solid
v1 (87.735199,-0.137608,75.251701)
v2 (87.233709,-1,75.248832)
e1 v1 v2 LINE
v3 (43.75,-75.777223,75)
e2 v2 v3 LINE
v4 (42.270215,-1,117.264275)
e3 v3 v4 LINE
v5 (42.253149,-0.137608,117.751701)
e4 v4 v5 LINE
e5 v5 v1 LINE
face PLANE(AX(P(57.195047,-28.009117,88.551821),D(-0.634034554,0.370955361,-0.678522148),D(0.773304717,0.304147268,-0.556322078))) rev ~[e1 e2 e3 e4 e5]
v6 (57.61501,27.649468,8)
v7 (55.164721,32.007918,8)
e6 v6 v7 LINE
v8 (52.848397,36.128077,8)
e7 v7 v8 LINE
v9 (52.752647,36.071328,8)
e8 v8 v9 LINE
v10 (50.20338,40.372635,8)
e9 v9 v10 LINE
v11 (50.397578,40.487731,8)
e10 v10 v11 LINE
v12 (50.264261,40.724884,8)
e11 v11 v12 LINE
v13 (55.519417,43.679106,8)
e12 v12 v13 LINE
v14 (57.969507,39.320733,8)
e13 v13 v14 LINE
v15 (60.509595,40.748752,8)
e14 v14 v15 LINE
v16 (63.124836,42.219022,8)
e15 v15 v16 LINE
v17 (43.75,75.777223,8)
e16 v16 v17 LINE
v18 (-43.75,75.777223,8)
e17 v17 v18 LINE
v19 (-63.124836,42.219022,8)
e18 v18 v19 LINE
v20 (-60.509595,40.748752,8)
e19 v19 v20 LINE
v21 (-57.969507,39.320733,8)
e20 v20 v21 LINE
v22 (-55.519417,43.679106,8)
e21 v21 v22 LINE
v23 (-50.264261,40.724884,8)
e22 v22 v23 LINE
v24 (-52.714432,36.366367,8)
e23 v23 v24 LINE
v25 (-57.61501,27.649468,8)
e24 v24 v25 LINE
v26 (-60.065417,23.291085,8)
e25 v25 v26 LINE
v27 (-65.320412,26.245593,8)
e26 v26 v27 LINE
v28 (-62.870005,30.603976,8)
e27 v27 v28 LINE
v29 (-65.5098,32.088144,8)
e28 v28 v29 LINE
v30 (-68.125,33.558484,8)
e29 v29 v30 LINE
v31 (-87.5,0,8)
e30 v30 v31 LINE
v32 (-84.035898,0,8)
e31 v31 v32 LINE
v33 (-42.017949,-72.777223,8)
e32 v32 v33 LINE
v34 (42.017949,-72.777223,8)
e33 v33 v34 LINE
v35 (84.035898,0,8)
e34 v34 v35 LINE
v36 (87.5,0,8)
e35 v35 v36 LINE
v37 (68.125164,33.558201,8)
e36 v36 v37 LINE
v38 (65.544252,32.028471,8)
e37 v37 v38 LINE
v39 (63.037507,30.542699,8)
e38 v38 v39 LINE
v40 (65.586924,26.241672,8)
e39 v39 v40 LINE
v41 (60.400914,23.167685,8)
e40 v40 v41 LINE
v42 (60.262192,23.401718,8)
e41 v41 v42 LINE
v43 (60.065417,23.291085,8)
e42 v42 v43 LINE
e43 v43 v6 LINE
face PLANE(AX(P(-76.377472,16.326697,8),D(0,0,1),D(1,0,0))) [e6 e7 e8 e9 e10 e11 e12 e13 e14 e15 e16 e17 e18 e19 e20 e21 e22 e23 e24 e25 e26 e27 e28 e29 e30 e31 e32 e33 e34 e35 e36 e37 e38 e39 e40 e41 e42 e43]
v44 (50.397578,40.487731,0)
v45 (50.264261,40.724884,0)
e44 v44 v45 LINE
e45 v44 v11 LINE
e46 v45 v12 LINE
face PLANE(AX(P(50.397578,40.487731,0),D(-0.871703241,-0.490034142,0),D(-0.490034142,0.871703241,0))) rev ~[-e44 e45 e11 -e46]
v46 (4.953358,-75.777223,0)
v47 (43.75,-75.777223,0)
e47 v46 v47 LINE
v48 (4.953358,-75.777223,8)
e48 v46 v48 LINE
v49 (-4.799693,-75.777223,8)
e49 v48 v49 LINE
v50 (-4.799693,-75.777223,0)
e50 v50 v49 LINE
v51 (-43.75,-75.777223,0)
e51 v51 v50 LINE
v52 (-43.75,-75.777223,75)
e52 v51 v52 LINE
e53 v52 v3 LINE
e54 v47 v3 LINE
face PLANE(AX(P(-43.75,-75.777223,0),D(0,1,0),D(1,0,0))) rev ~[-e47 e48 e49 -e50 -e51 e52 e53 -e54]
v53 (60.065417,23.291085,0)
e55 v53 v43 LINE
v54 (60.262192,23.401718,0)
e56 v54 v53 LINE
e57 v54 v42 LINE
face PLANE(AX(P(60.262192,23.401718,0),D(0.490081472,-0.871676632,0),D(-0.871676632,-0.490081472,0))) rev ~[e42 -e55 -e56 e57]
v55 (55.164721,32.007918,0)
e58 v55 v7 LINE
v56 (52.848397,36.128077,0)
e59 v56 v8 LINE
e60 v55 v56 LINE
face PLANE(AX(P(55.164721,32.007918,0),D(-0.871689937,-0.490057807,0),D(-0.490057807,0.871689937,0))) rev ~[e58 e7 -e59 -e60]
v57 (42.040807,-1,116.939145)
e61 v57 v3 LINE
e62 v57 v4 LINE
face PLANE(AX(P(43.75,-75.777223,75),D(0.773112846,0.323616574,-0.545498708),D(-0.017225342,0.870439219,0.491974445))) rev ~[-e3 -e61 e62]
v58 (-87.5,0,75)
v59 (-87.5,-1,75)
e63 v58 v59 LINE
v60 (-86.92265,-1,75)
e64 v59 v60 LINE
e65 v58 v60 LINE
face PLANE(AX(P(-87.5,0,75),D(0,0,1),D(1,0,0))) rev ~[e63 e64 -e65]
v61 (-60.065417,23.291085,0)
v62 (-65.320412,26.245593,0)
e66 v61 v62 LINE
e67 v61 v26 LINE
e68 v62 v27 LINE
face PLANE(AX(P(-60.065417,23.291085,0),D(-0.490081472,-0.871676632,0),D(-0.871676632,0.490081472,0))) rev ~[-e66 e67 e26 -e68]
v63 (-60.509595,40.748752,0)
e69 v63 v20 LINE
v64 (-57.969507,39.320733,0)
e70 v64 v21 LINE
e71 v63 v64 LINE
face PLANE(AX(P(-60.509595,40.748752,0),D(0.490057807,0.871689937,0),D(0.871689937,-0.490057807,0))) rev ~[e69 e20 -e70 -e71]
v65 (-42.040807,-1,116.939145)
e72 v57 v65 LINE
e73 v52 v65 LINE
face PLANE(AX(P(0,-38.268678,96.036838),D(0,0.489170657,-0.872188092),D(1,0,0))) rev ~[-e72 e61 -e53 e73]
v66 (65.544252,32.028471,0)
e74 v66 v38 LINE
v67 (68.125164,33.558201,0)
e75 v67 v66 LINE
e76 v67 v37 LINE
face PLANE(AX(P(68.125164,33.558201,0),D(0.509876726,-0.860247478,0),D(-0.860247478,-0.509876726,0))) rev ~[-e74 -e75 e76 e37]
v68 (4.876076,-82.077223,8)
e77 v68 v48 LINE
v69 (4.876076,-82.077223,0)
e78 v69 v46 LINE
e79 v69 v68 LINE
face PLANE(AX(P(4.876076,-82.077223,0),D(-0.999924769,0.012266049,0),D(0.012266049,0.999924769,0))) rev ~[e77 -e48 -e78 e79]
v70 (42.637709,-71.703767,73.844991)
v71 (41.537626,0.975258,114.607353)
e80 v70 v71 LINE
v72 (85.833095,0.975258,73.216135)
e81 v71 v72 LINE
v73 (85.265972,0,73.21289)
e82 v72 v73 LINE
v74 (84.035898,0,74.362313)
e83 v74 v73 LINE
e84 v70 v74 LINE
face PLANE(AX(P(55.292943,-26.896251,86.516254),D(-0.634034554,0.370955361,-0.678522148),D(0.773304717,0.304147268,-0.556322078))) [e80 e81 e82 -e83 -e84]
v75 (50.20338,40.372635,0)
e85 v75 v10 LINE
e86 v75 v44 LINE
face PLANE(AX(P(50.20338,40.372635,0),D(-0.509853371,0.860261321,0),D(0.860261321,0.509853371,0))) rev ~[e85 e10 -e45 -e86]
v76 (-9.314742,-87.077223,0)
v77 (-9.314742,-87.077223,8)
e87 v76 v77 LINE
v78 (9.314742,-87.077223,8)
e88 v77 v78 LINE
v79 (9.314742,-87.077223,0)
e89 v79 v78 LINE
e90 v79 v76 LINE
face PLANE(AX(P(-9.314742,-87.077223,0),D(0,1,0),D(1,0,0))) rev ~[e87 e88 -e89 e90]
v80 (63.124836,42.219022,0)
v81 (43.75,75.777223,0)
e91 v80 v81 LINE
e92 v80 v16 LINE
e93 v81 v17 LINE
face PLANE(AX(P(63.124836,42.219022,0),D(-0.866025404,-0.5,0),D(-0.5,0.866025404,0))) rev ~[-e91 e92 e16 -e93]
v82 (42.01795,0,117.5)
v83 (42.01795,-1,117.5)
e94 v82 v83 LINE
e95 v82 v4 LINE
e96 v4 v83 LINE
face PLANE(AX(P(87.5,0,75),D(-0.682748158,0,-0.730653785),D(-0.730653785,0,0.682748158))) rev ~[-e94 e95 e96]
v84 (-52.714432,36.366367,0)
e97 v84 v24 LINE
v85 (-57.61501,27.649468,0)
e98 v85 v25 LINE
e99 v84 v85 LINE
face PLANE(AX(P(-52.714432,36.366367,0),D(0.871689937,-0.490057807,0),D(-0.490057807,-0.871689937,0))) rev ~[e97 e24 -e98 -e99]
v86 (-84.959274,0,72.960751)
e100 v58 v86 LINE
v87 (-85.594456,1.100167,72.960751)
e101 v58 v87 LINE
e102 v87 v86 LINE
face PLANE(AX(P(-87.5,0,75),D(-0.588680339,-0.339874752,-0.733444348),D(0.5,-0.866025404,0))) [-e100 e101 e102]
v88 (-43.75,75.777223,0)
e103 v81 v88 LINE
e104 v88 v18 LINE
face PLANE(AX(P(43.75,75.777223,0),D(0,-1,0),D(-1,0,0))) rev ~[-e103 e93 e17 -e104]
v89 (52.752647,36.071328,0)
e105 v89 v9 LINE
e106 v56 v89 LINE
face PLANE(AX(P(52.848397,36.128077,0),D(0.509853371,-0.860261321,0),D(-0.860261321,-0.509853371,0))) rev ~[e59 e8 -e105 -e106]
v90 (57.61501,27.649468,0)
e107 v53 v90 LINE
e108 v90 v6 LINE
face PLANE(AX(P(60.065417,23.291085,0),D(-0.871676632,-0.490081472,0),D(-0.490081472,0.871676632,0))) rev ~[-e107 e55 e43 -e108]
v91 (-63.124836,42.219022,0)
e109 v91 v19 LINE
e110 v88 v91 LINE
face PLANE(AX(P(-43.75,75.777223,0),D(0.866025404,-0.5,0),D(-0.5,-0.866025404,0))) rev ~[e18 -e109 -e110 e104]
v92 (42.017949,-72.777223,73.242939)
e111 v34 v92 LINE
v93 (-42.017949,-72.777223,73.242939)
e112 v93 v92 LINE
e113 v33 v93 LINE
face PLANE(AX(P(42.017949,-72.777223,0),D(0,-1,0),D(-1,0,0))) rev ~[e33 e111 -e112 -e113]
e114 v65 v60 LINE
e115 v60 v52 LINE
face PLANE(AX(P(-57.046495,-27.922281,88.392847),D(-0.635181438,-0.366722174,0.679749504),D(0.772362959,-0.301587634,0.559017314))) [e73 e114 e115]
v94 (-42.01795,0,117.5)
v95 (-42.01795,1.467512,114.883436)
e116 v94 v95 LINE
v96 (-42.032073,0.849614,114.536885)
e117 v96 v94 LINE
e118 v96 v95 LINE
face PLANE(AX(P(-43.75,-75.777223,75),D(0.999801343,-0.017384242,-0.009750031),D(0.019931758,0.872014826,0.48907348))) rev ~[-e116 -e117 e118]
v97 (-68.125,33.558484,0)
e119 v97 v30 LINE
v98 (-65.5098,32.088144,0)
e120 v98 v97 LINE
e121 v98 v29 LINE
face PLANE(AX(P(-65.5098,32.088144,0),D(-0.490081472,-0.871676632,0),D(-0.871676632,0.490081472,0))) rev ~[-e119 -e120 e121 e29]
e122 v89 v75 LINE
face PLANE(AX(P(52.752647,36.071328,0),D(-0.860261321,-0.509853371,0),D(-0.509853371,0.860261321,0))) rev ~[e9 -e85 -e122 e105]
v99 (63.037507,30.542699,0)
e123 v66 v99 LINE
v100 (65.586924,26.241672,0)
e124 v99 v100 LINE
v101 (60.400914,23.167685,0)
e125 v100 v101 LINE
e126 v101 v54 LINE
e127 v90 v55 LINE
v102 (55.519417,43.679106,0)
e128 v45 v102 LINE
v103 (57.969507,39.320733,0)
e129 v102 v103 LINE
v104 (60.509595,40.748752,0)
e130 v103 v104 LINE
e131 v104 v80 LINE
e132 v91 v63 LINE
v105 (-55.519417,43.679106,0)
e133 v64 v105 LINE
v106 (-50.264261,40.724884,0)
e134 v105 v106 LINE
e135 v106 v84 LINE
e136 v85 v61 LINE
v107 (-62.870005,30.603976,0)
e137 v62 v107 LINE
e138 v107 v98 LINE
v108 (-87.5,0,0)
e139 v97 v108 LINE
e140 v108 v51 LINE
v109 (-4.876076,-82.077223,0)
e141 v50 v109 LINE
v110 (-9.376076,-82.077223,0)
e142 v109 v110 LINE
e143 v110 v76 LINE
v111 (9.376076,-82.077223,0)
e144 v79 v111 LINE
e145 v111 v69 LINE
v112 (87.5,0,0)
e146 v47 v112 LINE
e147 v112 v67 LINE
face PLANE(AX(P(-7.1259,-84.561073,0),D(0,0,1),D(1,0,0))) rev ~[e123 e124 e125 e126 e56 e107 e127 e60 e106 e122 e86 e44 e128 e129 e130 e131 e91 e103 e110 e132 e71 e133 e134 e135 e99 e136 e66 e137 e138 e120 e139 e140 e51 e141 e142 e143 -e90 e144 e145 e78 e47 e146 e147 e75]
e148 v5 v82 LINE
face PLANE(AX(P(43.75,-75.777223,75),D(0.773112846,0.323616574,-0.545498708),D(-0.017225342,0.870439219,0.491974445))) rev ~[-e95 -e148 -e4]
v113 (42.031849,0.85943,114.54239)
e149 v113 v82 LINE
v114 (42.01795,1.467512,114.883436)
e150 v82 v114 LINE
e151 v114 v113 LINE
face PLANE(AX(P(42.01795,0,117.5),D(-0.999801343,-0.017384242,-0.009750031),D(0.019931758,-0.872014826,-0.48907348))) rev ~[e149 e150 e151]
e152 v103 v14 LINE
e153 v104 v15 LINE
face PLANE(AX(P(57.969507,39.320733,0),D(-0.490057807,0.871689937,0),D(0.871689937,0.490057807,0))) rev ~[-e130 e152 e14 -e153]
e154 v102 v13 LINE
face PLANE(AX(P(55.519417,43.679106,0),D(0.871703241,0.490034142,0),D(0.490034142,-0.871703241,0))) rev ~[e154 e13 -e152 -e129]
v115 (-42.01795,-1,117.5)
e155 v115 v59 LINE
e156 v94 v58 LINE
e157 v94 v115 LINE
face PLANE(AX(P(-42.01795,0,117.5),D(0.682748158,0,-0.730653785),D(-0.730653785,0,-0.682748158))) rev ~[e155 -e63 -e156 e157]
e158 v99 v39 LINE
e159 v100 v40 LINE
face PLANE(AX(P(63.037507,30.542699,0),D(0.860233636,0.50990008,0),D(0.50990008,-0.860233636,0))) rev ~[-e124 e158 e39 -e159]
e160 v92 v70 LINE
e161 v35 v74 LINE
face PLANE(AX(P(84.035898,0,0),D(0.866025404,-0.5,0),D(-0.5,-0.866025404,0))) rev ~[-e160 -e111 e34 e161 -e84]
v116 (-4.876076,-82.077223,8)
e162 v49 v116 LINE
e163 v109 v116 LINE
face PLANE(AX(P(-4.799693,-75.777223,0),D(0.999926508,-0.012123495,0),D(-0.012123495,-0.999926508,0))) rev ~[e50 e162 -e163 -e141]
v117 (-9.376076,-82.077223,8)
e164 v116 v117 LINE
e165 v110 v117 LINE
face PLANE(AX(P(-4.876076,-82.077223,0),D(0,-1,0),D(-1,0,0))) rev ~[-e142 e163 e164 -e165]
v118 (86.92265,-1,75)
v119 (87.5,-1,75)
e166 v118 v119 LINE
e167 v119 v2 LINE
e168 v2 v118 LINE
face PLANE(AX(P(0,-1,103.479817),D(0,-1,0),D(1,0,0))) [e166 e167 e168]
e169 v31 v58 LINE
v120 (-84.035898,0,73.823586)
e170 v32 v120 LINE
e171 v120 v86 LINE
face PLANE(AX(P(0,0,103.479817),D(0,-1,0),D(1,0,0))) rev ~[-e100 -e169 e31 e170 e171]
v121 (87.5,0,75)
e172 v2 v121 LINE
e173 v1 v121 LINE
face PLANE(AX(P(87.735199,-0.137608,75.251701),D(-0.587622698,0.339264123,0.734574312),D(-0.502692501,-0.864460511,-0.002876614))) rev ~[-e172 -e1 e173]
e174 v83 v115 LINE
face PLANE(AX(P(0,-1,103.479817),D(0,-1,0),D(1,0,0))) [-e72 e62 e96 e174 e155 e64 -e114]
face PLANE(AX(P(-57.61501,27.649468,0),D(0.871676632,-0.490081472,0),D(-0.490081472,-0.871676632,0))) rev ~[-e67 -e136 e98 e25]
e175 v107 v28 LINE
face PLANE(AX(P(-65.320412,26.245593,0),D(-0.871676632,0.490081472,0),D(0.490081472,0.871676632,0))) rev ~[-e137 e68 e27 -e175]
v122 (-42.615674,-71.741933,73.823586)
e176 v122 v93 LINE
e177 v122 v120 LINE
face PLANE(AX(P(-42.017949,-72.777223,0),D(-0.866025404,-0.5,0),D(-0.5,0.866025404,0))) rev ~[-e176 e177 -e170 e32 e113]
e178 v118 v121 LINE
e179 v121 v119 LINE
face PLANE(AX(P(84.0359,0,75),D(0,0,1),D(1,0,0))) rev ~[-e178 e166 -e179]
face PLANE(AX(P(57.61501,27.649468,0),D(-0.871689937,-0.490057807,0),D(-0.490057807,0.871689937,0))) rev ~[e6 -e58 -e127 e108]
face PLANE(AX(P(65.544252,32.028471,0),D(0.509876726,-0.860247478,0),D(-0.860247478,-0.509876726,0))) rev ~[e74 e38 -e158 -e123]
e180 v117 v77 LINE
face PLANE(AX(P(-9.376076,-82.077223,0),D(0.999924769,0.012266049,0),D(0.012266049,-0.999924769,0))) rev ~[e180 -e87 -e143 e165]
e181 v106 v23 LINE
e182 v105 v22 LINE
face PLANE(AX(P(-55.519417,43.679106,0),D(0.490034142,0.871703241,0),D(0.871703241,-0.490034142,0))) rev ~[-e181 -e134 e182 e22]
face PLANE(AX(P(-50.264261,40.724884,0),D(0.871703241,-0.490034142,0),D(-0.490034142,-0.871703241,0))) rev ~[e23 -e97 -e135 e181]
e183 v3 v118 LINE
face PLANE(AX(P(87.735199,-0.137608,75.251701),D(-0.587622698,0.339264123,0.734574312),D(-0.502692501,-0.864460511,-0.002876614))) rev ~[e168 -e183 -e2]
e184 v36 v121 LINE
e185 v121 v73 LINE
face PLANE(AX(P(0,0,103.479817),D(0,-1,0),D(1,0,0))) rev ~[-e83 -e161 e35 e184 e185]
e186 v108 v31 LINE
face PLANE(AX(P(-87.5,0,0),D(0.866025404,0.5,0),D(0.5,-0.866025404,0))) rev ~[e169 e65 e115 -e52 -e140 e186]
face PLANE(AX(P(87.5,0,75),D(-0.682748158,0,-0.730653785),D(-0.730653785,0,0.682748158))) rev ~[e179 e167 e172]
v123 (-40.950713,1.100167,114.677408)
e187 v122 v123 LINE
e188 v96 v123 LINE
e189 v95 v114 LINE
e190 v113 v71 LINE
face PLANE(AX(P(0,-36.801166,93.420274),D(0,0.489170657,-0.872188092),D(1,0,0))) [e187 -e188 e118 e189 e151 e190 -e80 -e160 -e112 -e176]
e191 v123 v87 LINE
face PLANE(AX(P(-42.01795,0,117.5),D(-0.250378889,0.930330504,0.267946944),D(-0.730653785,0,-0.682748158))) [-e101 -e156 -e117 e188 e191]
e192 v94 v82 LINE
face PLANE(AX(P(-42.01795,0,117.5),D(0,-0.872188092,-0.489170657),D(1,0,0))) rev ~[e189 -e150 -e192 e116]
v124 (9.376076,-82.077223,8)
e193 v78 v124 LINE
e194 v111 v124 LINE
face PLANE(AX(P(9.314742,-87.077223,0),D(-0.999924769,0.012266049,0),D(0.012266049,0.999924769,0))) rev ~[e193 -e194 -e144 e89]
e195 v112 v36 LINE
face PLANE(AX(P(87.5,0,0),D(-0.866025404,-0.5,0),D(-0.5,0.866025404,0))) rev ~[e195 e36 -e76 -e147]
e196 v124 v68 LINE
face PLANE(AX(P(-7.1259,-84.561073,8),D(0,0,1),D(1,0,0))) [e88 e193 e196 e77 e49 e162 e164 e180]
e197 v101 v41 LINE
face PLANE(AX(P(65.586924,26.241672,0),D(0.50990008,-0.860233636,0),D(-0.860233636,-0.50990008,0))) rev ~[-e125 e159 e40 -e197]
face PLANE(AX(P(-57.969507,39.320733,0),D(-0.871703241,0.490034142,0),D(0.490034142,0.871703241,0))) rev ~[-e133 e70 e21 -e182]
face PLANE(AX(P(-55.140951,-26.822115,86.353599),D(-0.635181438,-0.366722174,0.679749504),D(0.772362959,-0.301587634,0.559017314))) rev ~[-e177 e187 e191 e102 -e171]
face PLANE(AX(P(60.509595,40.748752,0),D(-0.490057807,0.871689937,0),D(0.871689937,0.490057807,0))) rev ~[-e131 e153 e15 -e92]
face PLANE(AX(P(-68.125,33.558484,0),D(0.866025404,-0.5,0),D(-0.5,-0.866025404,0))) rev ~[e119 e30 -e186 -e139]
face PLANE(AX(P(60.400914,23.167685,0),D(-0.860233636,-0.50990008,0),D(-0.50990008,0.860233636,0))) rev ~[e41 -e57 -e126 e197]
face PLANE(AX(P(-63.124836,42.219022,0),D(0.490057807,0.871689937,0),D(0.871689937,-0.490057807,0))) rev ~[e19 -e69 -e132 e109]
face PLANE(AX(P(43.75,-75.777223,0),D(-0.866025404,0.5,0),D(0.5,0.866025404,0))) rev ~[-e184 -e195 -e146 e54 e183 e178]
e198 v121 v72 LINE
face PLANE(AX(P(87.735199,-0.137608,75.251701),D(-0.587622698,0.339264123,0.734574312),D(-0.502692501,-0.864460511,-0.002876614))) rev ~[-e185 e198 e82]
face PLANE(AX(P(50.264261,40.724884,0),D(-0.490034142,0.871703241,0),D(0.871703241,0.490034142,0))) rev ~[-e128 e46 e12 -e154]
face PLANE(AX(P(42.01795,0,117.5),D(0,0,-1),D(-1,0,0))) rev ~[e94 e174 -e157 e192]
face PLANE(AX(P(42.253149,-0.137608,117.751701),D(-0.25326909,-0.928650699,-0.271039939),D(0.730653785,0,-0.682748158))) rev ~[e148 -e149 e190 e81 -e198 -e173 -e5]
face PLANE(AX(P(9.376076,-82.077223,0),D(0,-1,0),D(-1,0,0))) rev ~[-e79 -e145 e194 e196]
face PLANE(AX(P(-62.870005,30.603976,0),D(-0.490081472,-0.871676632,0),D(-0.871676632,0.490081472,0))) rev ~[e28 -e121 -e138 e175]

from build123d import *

# Parameters (mm, degrees)
F0_W      = 50
F0_H      = 12.5
F1_DEPTH  = 8
F2_DEPTH  = 75
F4_DEPTH  = 8
F7_DEPTH  = 3
F8_DEPTH  = 1
F11_DEPTH = 3
F14_DEPTH = 3
F15_DEPTH = 8
F16_DEPTH = 25
F17_DEPTH = 8
F18_DEPTH = 8
F19_DEPTH = 8


# Not quite as in the source:
# - a feature names something its author has since deleted; it is built from what else it names


with BuildPart() as f1:
    # F0 (on Top) → F1 (new body)
    with BuildSketch(Plane.XY):
        Polygon((-42.0179491924, 72.7772228311), (-60.5095952989, 40.7487522591), (-57.9695070384, 39.3207329262), (-55.5194165334, 43.6791064608), (-50.2642610162, 40.7248836223), (-52.7144317239, 36.366367418), (-57.615009792, 27.6494680496), (-60.0654171506, 23.2910848888), (-65.3204122546, 26.2455930623), (-62.870004896, 30.6039762231), (-65.5097997054, 32.0881441788), (-84.0358983849, 0), (-42.0179491924, -72.7772228311), (42.0179491924, -72.7772228311), (84.0358983849, 0), (65.5442522784, 32.028470572), (63.0375071287, 30.542699277), (65.5869240764, 26.2416718908), (60.4009142911, 23.1676851313), (60.2621924773, 23.4017175915), (60.0654171506, 23.2910848888), (57.615009792, 27.6494680496), (55.164720758, 32.0079177338), (52.8483970279, 36.1280767392), (52.7526466281, 36.0713280944), (50.2033797707, 40.372634697), (50.3975781651, 40.4877307774), (50.2642610162, 40.7248836223), (55.5194165334, 43.6791064608), (57.9695070384, 39.3207329262), (60.5095952989, 40.7487522591), (42.0179491924, 72.7772228311), align=None)
        with Locations((0, 54.5829171234)):
            Rectangle(F0_W, F0_H, mode=Mode.SUBTRACT)
    extrude(amount=F1_DEPTH)

    # F0 (on Top) → F2 (join)
    with BuildSketch(Plane.XY):
        Polygon((-84.0358983849, 0), (-87.5, 0), (-43.75, -75.7772228311), (-4.799692811, -75.7772228311), (4.9533583678, -75.7772228311), (43.75, -75.7772228311), (87.5, 0), (84.0358983849, 0), (42.0179491924, -72.7772228311), (-42.0179491924, -72.7772228311), align=None)
    extrude(amount=F2_DEPTH)

    # F0 (on Top) → F4 (join)
    with BuildSketch(Plane.XY):
        Polygon((43.75, 75.7772228311), (-43.75, 75.7772228311), (-63.1248363216, 42.2190219338), (-60.5095952989, 40.7487522591), (-42.0179491924, 72.7772228311), (42.0179491924, 72.7772228311), (60.5095952989, 40.7487522591), (63.1248363216, 42.2190219338), align=None)
    extrude(amount=F4_DEPTH)

    # F6 (on face) → F7 (join)
    with BuildSketch(Plane(origin=(0, -50.1312366318, 89.3836679776), x_dir=(1, 0, 0), z_dir=(0, 0.4891706574, -0.872188092))):
        Polygon((43.75, 29.4041920927), (0, 29.4041920927), (-43.75, 29.4041920927), (-42.01795, -57.4775522498), (42.01795, -57.4775522498), align=None)
    extrude(amount=F7_DEPTH)

    # F3 (on Front) → F8 (join)
    with BuildSketch(Plane.XZ):
        Polygon((-42.01795, 114.5), (0, 114.5), (42.01795, 114.5), (84.0359, 75), (87.5, 75), (42.01795, 117.5), (0, 117.5), (-42.01795, 117.5), (-87.5, 75), (-84.0359, 75), align=None)
    extrude(amount=F8_DEPTH)

    # F10 (on face) → F11 (join)
    with BuildSketch(Plane(origin=(-67.6846727043, -39.0777640058, 72.4338274863), x_dir=(0.7723629594, -0.3015876344, 0.5590173143), z_dir=(-0.6351814378, -0.3667221741, 0.6797495039))):
        Polygon((33.2314262259, 55.789645187), (-25.6554603702, 35.6104118215), (30.9888924807, -31.0804218073), align=None)
    extrude(amount=-F11_DEPTH)

    # F13 (on face) → F14 (join)
    with BuildSketch(Plane(origin=(67.6756688636, -39.5950852503, 72.4241918832), x_dir=(0.7733047167, 0.3041472681, -0.556322078), z_dir=(-0.6340345536, 0.3709553614, -0.6785221475))):
        Polygon((-30.939509805, 30.5117392321), (-32.8751652468, -56.3649154418), (25.9400068576, -35.9776056011), align=None)
    extrude(amount=F14_DEPTH)

    # F0 (on Top) → F15 (join)
    with BuildSketch(Plane.XY):
        with Locations((0, 54.5829171234)):
            Rectangle(F0_W, F0_H)
    extrude(amount=F15_DEPTH)

    # F0 (on Top) → F16 (cut)
    with BuildSketch(Plane.XY):
        Polygon((-57.9695070384, 39.3207329262), (-60.5095952989, 40.7487522591), (-65.5097997054, 32.0881441788), (-62.870004896, 30.6039762231), (-57.615009792, 27.6494680496), (-52.7144317239, 36.366367418), align=None)
    extrude(amount=-F16_DEPTH, mode=Mode.SUBTRACT)

    # F0 (on Top) → F17 (join)
    with BuildSketch(Plane.XY):
        Polygon((-65.5097997054, 32.0881441788), (-68.125, 33.5584843966), (-87.5, 0), (-84.0358983849, 0), align=None)
        Polygon((87.5, 0), (68.1251636784, 33.5582008974), (65.5442522784, 32.028470572), (84.0358983849, 0), align=None)
    extrude(amount=F17_DEPTH)

    # F0 (on Top) → F18 (join)
    with BuildSketch(Plane.XY):
        Polygon((4.9533583678, -75.7772228311), (-4.799692811, -75.7772228311), (-4.8760764436, -82.0772228311), (-4.9366983742, -87.0772228311), (-4.8147415831, -87.0772228311), (4.8147415831, -87.0772228311), (4.8760764436, -82.0772228311), align=None)
        Polygon((9.3760764436, -82.0772228311), (4.8760764436, -82.0772228311), (4.8147415831, -87.0772228311), (9.3147415831, -87.0772228311), align=None)
    extrude(amount=F18_DEPTH)

    # F0 (on Top) → F19 (join)
    with BuildSketch(Plane.XY):
        Polygon((-4.9366983742, -87.0772228311), (-4.8760764436, -82.0772228311), (-9.3760764436, -82.0772228311), (-9.3147415831, -87.0772228311), align=None)
    extrude(amount=F19_DEPTH)


solid = f1.part
